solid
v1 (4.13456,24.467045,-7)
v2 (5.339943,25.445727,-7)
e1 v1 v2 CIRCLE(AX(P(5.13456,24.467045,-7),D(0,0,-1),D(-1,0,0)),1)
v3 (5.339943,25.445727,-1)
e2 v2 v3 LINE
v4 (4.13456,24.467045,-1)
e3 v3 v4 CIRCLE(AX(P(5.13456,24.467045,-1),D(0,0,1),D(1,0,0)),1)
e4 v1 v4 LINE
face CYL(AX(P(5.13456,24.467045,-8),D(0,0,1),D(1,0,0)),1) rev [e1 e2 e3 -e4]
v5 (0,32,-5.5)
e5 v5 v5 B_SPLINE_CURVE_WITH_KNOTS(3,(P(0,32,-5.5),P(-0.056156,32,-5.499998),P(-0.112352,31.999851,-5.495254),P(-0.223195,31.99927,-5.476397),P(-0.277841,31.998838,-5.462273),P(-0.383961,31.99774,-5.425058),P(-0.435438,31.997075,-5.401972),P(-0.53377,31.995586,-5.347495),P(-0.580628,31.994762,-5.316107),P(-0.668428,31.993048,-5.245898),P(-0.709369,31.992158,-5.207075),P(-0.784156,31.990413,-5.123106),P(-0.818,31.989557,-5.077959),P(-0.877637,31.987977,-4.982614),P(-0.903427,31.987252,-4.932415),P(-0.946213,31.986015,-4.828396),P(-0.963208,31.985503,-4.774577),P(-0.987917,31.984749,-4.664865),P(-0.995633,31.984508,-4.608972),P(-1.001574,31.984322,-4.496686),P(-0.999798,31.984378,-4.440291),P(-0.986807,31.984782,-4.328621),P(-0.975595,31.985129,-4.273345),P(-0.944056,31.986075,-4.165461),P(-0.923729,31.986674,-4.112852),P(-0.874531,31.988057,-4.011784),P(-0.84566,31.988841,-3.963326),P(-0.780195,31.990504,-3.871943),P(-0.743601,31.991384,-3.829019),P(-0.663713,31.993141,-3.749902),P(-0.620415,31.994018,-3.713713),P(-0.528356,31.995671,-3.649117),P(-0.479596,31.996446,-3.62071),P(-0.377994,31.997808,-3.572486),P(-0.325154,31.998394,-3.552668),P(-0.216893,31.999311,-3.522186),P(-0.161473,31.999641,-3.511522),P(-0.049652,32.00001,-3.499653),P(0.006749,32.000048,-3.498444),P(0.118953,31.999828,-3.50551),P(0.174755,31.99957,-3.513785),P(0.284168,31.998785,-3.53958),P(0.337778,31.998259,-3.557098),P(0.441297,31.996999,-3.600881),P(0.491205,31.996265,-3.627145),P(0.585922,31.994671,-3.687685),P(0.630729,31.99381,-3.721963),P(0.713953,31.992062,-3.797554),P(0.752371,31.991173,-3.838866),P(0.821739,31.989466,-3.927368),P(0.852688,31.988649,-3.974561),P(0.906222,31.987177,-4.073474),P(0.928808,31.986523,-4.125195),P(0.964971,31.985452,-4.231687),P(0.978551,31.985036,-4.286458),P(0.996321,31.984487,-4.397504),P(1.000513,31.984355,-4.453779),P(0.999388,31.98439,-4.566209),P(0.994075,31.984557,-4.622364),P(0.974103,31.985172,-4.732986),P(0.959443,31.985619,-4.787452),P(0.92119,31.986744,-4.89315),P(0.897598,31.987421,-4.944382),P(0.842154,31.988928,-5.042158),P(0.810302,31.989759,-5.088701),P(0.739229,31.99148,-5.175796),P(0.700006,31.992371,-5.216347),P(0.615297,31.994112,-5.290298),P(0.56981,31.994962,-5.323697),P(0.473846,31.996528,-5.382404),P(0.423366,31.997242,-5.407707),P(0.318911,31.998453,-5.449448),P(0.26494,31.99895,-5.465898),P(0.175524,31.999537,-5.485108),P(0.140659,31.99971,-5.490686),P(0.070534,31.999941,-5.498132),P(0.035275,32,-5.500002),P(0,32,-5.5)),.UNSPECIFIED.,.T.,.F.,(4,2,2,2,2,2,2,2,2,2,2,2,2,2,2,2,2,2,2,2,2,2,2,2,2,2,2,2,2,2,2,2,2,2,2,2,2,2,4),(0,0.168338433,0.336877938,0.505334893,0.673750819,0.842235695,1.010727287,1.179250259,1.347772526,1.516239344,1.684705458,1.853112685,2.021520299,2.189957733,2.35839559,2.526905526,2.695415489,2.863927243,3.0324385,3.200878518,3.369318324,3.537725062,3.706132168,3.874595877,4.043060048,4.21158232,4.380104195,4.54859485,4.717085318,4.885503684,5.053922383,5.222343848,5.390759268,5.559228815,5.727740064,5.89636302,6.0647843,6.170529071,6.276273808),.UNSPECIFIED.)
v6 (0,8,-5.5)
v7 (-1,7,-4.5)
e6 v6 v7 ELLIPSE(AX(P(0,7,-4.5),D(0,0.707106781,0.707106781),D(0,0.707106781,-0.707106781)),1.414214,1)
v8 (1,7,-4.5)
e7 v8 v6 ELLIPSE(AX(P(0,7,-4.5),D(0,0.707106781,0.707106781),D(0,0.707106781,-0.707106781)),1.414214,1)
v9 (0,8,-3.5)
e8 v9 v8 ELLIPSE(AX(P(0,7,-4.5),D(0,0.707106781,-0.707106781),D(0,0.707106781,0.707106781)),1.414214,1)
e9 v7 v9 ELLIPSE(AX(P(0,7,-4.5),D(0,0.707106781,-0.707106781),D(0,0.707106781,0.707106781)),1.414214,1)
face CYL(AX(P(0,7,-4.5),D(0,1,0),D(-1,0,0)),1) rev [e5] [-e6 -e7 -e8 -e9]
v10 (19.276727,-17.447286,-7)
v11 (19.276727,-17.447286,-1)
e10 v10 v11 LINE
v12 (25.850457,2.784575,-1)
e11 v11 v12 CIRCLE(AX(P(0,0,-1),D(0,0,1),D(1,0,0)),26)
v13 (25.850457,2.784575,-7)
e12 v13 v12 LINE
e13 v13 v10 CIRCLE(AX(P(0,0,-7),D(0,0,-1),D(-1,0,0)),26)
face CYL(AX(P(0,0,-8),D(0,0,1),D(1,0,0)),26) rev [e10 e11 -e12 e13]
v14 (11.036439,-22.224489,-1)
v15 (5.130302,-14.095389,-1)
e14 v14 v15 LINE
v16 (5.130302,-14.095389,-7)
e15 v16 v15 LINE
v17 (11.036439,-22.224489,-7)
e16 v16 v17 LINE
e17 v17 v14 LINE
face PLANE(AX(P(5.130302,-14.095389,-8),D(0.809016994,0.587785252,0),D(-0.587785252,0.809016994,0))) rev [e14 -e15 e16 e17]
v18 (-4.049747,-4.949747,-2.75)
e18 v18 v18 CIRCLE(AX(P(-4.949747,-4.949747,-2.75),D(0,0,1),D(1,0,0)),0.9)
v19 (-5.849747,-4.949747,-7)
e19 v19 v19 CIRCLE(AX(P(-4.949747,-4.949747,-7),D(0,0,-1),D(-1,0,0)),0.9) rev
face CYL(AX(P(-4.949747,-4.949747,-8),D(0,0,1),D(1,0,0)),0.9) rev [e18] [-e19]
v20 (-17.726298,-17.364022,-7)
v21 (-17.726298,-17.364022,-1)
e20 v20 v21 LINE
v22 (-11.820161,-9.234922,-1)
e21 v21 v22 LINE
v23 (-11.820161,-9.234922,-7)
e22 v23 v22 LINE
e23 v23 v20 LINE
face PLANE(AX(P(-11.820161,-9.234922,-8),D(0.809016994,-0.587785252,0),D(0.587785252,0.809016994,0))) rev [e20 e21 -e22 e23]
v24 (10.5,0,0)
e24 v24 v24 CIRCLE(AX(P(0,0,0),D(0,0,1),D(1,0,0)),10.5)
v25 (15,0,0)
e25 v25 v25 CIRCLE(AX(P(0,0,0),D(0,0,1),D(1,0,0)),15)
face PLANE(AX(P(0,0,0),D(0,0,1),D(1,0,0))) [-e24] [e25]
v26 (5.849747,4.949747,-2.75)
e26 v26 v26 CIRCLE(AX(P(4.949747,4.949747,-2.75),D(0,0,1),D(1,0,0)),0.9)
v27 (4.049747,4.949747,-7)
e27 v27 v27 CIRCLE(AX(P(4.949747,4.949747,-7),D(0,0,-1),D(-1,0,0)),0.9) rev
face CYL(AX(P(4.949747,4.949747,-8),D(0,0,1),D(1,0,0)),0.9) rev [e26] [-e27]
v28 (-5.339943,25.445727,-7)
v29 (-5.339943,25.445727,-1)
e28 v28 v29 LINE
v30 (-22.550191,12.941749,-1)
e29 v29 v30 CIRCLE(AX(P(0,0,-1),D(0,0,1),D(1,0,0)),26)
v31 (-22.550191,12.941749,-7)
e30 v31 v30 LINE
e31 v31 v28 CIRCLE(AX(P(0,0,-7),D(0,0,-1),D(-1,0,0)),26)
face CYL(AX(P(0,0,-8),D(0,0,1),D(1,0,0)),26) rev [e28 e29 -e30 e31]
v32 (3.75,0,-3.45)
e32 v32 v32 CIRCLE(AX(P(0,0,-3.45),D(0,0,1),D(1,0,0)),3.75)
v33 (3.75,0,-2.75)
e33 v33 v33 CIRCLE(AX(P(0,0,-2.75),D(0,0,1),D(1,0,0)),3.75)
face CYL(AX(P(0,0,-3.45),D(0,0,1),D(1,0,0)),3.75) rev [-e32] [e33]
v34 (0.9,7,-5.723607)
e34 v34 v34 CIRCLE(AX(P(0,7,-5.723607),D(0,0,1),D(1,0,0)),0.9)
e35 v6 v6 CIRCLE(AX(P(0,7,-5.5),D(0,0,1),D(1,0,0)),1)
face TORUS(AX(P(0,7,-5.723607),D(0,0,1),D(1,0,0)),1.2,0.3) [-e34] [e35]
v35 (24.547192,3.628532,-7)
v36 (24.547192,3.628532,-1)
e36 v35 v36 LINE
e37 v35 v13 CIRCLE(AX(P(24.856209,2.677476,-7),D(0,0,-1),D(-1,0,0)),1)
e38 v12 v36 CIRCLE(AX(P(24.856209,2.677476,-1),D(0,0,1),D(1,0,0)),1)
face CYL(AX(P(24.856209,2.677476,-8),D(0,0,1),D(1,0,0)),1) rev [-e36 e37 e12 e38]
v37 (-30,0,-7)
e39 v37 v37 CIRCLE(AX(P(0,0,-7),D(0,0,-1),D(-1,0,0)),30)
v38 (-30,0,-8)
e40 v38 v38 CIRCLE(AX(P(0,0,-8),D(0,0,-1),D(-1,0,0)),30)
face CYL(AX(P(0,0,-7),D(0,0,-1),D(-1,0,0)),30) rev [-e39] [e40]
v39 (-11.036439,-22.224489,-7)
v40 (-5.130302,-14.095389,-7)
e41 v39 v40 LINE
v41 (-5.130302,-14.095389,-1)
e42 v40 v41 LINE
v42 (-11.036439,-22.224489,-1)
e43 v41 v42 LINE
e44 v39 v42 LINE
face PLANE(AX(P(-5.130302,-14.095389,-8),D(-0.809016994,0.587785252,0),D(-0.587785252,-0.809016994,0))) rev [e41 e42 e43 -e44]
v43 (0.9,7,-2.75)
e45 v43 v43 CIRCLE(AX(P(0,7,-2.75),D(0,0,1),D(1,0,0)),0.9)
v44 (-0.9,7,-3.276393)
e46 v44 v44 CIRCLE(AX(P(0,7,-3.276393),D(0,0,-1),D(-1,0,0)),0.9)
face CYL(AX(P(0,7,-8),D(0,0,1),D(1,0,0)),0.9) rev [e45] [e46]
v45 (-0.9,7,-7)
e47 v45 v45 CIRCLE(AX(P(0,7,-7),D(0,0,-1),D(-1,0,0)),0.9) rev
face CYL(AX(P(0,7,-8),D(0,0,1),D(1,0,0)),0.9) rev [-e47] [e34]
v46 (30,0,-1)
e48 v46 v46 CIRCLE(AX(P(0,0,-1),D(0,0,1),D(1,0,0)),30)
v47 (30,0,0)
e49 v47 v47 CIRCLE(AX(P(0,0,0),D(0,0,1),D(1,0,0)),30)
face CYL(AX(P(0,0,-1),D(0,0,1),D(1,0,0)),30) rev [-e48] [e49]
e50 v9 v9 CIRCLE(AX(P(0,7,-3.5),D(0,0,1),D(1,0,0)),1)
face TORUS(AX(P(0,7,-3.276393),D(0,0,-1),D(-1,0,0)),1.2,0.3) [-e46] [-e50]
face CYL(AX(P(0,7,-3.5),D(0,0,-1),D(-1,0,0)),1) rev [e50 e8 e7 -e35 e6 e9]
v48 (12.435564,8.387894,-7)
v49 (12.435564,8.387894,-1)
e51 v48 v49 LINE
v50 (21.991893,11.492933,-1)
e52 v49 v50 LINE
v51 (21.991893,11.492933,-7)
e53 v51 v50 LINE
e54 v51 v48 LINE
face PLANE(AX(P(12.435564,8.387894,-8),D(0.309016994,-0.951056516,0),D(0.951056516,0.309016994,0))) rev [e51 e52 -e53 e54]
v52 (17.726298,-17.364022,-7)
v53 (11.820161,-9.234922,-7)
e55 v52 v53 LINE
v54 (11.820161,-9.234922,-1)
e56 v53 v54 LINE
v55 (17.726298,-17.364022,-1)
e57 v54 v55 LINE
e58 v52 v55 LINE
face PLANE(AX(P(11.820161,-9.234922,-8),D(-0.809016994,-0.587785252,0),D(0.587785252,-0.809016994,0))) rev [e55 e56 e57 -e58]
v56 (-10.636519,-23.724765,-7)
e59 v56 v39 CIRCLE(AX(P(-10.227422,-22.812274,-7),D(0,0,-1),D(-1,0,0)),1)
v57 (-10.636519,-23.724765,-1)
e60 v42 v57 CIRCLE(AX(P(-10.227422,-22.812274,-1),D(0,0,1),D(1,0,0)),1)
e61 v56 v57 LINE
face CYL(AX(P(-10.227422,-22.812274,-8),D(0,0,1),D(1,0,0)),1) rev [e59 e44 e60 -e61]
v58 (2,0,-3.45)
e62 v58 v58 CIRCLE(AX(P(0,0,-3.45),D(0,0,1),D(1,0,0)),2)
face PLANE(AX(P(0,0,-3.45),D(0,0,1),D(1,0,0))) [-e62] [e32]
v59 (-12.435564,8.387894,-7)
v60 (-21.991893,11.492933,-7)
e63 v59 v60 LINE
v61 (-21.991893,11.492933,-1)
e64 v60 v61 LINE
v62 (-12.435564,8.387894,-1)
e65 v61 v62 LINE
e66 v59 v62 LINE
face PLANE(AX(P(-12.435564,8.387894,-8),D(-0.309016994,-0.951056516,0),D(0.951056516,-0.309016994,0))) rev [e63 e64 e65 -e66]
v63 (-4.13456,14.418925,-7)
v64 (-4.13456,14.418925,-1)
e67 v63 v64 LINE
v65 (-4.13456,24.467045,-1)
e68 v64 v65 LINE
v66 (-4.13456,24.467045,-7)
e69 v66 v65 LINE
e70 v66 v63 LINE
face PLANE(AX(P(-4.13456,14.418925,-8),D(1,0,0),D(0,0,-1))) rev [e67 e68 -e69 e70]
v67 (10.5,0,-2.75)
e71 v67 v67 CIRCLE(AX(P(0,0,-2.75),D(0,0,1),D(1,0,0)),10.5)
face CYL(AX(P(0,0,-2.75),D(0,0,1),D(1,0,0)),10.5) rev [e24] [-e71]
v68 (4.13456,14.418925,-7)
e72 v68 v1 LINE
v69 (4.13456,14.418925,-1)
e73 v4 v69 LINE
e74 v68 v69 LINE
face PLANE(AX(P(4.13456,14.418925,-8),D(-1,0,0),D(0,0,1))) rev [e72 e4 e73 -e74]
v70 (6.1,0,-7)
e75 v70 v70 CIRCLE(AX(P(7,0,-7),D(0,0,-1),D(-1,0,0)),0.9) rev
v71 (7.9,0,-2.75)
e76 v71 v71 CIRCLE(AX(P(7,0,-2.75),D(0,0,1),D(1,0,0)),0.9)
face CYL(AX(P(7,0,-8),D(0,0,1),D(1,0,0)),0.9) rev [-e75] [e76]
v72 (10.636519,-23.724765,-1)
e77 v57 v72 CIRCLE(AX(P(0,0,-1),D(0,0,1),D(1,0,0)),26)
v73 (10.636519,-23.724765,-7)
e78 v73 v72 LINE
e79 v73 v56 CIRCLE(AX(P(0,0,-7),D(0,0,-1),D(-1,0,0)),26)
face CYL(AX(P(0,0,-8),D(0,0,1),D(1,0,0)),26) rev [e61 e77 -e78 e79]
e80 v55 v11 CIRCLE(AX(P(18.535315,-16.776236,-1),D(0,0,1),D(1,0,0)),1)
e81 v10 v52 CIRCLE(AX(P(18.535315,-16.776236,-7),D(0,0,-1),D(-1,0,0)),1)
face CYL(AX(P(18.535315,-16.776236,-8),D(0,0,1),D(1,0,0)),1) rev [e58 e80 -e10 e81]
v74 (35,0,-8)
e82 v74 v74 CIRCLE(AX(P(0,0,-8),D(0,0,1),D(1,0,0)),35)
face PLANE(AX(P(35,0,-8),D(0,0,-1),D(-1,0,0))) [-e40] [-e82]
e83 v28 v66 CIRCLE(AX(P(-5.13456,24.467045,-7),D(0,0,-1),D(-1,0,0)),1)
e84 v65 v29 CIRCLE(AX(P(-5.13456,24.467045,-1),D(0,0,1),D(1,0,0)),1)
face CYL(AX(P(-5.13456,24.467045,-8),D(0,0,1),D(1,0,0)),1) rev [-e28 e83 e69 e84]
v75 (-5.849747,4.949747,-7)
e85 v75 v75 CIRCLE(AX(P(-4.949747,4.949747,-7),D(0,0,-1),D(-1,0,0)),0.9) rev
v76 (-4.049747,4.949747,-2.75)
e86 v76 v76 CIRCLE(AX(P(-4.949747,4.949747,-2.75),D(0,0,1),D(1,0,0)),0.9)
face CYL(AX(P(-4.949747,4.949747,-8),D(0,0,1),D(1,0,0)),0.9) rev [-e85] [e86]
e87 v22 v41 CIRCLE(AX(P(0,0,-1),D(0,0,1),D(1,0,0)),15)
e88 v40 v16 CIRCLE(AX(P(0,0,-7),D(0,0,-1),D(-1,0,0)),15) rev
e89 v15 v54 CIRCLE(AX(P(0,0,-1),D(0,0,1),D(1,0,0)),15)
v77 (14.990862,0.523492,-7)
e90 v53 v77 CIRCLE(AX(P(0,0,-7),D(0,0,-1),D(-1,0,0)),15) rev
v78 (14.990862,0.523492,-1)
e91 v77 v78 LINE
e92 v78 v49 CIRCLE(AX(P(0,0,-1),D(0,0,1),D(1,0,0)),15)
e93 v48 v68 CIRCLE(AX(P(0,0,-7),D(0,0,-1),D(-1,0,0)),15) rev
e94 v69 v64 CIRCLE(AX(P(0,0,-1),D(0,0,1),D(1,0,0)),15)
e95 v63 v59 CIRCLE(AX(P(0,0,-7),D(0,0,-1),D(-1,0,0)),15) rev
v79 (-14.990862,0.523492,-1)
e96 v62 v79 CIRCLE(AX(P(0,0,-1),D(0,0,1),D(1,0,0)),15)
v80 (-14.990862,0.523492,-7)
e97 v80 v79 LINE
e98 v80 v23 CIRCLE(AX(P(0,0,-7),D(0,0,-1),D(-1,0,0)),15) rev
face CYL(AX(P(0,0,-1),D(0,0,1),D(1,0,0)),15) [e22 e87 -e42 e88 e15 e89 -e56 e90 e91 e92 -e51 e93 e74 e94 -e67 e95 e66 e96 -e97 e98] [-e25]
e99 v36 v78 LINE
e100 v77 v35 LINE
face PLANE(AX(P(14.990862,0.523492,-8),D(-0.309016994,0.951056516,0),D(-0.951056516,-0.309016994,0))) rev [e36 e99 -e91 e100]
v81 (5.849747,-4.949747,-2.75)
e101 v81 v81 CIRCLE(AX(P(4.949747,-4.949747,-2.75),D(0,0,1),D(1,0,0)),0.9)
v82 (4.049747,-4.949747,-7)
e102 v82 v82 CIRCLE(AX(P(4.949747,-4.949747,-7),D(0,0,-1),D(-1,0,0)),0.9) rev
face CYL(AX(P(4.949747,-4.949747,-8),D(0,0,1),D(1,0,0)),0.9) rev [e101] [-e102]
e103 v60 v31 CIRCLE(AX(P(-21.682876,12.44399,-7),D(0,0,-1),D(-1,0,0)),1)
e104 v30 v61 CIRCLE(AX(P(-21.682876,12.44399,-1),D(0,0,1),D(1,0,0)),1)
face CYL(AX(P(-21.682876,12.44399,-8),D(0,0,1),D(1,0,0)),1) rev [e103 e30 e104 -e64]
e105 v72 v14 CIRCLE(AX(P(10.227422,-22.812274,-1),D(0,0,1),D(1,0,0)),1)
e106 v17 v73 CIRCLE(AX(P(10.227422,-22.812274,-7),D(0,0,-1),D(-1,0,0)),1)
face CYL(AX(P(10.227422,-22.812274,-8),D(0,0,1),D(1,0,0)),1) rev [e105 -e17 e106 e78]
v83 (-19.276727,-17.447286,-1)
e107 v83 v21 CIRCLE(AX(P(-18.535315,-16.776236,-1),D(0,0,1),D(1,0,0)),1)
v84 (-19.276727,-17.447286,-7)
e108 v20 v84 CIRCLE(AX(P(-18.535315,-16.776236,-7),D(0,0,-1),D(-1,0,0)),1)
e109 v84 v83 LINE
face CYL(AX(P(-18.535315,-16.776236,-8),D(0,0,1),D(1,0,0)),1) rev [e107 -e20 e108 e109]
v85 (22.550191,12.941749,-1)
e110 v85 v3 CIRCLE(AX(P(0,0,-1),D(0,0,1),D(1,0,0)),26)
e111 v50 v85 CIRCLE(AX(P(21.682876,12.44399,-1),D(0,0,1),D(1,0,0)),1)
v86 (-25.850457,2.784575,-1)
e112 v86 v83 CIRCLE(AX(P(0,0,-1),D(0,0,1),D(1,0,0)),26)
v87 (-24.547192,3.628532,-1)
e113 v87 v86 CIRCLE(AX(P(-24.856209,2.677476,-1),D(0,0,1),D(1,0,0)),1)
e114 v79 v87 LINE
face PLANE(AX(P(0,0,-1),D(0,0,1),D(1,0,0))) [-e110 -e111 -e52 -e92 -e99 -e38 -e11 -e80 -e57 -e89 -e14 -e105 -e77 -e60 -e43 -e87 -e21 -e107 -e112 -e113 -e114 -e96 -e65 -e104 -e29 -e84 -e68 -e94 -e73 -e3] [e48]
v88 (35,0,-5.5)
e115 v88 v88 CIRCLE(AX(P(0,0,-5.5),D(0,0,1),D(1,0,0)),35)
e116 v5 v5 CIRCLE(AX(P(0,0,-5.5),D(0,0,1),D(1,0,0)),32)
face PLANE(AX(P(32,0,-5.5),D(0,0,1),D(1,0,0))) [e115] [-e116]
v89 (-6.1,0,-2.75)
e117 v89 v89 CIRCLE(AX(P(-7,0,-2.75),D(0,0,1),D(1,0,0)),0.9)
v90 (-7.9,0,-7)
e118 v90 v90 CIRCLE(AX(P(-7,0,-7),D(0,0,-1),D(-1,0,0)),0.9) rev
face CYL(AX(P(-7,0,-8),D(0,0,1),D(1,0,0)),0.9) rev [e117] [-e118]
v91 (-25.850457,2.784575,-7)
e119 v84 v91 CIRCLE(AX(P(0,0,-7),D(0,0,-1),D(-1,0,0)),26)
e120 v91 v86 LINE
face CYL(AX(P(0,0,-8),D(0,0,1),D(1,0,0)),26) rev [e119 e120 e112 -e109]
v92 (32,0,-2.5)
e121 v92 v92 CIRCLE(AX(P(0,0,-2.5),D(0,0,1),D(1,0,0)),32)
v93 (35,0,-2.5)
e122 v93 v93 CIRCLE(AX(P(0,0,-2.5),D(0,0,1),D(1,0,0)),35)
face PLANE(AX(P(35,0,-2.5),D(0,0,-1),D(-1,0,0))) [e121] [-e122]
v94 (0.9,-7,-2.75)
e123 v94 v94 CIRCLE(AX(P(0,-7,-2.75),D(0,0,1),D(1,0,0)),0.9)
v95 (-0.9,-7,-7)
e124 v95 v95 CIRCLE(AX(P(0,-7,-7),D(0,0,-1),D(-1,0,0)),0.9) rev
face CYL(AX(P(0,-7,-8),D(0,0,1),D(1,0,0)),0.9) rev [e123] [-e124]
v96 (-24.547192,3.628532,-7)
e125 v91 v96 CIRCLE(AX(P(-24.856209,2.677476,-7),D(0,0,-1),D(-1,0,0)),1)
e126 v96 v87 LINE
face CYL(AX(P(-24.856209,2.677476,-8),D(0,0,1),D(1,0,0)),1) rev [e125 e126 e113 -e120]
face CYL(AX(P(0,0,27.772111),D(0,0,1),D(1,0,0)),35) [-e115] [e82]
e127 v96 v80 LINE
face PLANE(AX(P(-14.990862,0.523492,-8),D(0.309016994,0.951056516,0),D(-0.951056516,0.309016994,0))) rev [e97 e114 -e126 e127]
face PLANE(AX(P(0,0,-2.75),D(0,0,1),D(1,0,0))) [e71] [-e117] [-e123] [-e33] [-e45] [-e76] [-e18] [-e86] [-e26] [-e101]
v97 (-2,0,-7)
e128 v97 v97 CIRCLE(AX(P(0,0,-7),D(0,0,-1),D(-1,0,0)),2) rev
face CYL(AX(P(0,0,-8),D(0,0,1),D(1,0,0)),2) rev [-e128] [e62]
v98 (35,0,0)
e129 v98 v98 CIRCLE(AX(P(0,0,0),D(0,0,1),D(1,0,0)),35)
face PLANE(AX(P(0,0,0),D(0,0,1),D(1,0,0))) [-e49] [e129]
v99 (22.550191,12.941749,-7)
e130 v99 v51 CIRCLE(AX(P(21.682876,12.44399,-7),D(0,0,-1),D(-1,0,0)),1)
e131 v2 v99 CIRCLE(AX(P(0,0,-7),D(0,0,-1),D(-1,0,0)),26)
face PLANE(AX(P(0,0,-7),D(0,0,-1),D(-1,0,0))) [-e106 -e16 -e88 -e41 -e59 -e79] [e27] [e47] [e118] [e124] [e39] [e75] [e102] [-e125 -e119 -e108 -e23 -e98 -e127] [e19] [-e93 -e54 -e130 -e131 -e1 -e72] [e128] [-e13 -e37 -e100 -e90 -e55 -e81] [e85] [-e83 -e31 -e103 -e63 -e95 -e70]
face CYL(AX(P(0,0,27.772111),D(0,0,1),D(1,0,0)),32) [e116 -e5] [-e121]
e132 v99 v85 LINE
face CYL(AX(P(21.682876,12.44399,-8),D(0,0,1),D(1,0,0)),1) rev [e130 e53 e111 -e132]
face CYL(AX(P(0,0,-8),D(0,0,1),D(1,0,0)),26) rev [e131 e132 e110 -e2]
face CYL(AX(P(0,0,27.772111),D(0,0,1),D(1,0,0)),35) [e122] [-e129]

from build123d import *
from build123d.topology import SkipClean

# Parameters (mm, degrees)
SKETCH4_R              = 10.5
CUT_EXTRUDE2_DEPTH     = 2.75
SKETCH5_R              = 3.75
CUT_EXTRUDE3_DEPTH     = 0.7
SKETCH6_R              = 0.9
CUT_EXTRUDE4_DEPTH     = 50.775119287
SKETCH11_R             = 2
CUT_EXTRUDE8_DEPTH     = 50.70616159
CUT_EXTRUDE9_START     = -25
CUT_EXTRUDE9_OUTLINE_R = 1
CUT_EXTRUDE9_DEPTH     = 26
SKETCH18_R             = 30
CUT_EXTRUDE12_DEPTH    = 1
CUT_EXTRUDE13_START    = -1
SKETCH19_R             = 30
SKETCH19_R_2           = 15
CUT_EXTRUDE13_DEPTH    = 1
CUT_EXTRUDE14_DEPTH    = 50.989999
CIRPATTERN4_COUNT      = 5


with BuildPart() as part:
    # Sketch2 → Revolve1 (revolve)
    with BuildSketch(Plane(origin=(0, 0, 0), x_dir=(1, 0, 0), z_dir=(0, 1, 0))):
        Polygon((0, 0), (35, 0), (35, 2.5), (32, 2.5), (32, 5.5), (35, 5.5), (35, 8), (0, 8), align=None)
    revolve(axis=Axis((0, 0, 27.772111005), (0, 0, -1)))

    # Sketch4 → Cut-Extrude2 (cut)
    with BuildSketch(Plane.XY):
        Circle(SKETCH4_R)
    extrude(amount=-CUT_EXTRUDE2_DEPTH, mode=Mode.SUBTRACT)

    # Sketch5 → Cut-Extrude3 (cut)
    with BuildSketch(Plane.XY.offset(-2.75)):
        Circle(SKETCH5_R)
    extrude(amount=-CUT_EXTRUDE3_DEPTH, mode=Mode.SUBTRACT)

    # Sketch6 → Cut-Extrude4 (cut, through all)
    with BuildSketch(Plane.XY.offset(-2.75)):
        with Locations((0, 7)):
            Circle(SKETCH6_R)
        with Locations((4.949747468, 4.949747468)):
            Circle(SKETCH6_R)
        with Locations((7, 0)):
            Circle(SKETCH6_R)
        with Locations((4.949747468, -4.949747468)):
            Circle(SKETCH6_R)
        with Locations((0, -7)):
            Circle(SKETCH6_R)
        with Locations((-4.949747468, -4.949747468)):
            Circle(SKETCH6_R)
        with Locations((-7, 0)):
            Circle(SKETCH6_R)
        with Locations((-4.949747468, 4.949747468)):
            Circle(SKETCH6_R)
    extrude(amount=-CUT_EXTRUDE4_DEPTH, mode=Mode.SUBTRACT)

    # Sketch11 → Cut-Extrude8 (cut, through all)
    with BuildSketch(Plane.XY.offset(-3.45)):
        Circle(SKETCH11_R)
    extrude(amount=-CUT_EXTRUDE8_DEPTH, mode=Mode.SUBTRACT)

    # Cut-Extrude9: read off the stored shape, not the designer's step
    # Cut-Extrude9 outline → Cut-Extrude9 (cut)
    with BuildSketch(Plane(origin=(0, 32, 0), x_dir=(1, 0, 0), z_dir=(0, 1, 0)).offset(CUT_EXTRUDE9_START)):
        with Locations((0, 4.5)):
            Circle(CUT_EXTRUDE9_OUTLINE_R)
    extrude(amount=CUT_EXTRUDE9_DEPTH, mode=Mode.SUBTRACT)

    # Fillet4: read off the stored shape, not the designer's step
    # Fillet4 outline → Fillet4 (revolve, cut)
    with SkipClean():  # the faces are left unmerged after this step: merging them gives an invalid solid
        with BuildSketch(Plane.XZ.offset(-7)):
            with BuildLine():
                Line((1, -5.5), (1, -3.5))
                ThreePointArc((1, -3.5), (0.926138721, -3.398867689), (0.9, -3.276393202))
                Line((0.9, -3.276393202), (0.9, -5.723606798))
                ThreePointArc((0.9, -5.723606798), (0.926138721, -5.601132311), (1, -5.5))
            make_face()
        revolve(axis=Axis((0, 7, 0), (0, 0, 1)), mode=Mode.SUBTRACT)

    # Sketch18 → Cut-Extrude12 (cut)
    with SkipClean():  # the faces are left unmerged after this step: merging them gives an invalid solid
        with BuildSketch(Plane(origin=(0, 0, -8), x_dir=(-1, 0, 0), z_dir=(0, 0, -1))):
            Circle(SKETCH18_R)
        extrude(amount=-CUT_EXTRUDE12_DEPTH, mode=Mode.SUBTRACT)

    # Sketch19 → Cut-Extrude13 (cut)
    with SkipClean():  # the faces are left unmerged after this step: merging them gives an invalid solid
        with BuildSketch(Plane.XY.offset(CUT_EXTRUDE13_START)):
            with Locations(Location((0, 0, 0), (0, 0, 180))):
                Circle(SKETCH19_R)
            Circle(SKETCH19_R_2, mode=Mode.SUBTRACT)
        extrude(amount=CUT_EXTRUDE13_DEPTH, mode=Mode.SUBTRACT)

    # Sketch20 → Cut-Extrude14 (cut, symmetric)
    with SkipClean():  # the faces are left unmerged after this step: merging them gives an invalid solid
        with BuildSketch(Plane.XY.offset(-1)):
            with BuildLine():
                Line((12.435563588, 8.387893552), (21.991893156, 11.492933252))
                ThreePointArc((21.991893156, 11.492933252), (22.615992604, 12.084415431), (22.550191208, 12.941749359))
                ThreePointArc((22.550191208, 12.941749359), (15.28241656, 21.034441854), (5.339942751, 25.445726781))
                ThreePointArc((5.339942751, 25.445726781), (4.504235982, 25.243376874), (4.134560337, 24.467044982))
                Line((4.134560337, 24.467044982), (4.134560337, 14.418925439))
                ThreePointArc((4.134560337, 14.418925439), (8.816778784, 12.135254916), (12.435563588, 8.387893552))
            make_face()
        cut_extrude14 = extrude(amount=CUT_EXTRUDE14_DEPTH, both=True, mode=Mode.SUBTRACT)

    # CirPattern4: Cut-Extrude14 ×5 about axis
    with SkipClean():  # the faces are left unmerged after this step: merging them gives an invalid solid
        cirpattern4_axis = Axis((0, 0, 0), (0, 0, 1))
        for i in range(1, CIRPATTERN4_COUNT):
            add(cut_extrude14.rotate(cirpattern4_axis, i * 360 / CIRPATTERN4_COUNT), mode=Mode.SUBTRACT)


solid = part.part
